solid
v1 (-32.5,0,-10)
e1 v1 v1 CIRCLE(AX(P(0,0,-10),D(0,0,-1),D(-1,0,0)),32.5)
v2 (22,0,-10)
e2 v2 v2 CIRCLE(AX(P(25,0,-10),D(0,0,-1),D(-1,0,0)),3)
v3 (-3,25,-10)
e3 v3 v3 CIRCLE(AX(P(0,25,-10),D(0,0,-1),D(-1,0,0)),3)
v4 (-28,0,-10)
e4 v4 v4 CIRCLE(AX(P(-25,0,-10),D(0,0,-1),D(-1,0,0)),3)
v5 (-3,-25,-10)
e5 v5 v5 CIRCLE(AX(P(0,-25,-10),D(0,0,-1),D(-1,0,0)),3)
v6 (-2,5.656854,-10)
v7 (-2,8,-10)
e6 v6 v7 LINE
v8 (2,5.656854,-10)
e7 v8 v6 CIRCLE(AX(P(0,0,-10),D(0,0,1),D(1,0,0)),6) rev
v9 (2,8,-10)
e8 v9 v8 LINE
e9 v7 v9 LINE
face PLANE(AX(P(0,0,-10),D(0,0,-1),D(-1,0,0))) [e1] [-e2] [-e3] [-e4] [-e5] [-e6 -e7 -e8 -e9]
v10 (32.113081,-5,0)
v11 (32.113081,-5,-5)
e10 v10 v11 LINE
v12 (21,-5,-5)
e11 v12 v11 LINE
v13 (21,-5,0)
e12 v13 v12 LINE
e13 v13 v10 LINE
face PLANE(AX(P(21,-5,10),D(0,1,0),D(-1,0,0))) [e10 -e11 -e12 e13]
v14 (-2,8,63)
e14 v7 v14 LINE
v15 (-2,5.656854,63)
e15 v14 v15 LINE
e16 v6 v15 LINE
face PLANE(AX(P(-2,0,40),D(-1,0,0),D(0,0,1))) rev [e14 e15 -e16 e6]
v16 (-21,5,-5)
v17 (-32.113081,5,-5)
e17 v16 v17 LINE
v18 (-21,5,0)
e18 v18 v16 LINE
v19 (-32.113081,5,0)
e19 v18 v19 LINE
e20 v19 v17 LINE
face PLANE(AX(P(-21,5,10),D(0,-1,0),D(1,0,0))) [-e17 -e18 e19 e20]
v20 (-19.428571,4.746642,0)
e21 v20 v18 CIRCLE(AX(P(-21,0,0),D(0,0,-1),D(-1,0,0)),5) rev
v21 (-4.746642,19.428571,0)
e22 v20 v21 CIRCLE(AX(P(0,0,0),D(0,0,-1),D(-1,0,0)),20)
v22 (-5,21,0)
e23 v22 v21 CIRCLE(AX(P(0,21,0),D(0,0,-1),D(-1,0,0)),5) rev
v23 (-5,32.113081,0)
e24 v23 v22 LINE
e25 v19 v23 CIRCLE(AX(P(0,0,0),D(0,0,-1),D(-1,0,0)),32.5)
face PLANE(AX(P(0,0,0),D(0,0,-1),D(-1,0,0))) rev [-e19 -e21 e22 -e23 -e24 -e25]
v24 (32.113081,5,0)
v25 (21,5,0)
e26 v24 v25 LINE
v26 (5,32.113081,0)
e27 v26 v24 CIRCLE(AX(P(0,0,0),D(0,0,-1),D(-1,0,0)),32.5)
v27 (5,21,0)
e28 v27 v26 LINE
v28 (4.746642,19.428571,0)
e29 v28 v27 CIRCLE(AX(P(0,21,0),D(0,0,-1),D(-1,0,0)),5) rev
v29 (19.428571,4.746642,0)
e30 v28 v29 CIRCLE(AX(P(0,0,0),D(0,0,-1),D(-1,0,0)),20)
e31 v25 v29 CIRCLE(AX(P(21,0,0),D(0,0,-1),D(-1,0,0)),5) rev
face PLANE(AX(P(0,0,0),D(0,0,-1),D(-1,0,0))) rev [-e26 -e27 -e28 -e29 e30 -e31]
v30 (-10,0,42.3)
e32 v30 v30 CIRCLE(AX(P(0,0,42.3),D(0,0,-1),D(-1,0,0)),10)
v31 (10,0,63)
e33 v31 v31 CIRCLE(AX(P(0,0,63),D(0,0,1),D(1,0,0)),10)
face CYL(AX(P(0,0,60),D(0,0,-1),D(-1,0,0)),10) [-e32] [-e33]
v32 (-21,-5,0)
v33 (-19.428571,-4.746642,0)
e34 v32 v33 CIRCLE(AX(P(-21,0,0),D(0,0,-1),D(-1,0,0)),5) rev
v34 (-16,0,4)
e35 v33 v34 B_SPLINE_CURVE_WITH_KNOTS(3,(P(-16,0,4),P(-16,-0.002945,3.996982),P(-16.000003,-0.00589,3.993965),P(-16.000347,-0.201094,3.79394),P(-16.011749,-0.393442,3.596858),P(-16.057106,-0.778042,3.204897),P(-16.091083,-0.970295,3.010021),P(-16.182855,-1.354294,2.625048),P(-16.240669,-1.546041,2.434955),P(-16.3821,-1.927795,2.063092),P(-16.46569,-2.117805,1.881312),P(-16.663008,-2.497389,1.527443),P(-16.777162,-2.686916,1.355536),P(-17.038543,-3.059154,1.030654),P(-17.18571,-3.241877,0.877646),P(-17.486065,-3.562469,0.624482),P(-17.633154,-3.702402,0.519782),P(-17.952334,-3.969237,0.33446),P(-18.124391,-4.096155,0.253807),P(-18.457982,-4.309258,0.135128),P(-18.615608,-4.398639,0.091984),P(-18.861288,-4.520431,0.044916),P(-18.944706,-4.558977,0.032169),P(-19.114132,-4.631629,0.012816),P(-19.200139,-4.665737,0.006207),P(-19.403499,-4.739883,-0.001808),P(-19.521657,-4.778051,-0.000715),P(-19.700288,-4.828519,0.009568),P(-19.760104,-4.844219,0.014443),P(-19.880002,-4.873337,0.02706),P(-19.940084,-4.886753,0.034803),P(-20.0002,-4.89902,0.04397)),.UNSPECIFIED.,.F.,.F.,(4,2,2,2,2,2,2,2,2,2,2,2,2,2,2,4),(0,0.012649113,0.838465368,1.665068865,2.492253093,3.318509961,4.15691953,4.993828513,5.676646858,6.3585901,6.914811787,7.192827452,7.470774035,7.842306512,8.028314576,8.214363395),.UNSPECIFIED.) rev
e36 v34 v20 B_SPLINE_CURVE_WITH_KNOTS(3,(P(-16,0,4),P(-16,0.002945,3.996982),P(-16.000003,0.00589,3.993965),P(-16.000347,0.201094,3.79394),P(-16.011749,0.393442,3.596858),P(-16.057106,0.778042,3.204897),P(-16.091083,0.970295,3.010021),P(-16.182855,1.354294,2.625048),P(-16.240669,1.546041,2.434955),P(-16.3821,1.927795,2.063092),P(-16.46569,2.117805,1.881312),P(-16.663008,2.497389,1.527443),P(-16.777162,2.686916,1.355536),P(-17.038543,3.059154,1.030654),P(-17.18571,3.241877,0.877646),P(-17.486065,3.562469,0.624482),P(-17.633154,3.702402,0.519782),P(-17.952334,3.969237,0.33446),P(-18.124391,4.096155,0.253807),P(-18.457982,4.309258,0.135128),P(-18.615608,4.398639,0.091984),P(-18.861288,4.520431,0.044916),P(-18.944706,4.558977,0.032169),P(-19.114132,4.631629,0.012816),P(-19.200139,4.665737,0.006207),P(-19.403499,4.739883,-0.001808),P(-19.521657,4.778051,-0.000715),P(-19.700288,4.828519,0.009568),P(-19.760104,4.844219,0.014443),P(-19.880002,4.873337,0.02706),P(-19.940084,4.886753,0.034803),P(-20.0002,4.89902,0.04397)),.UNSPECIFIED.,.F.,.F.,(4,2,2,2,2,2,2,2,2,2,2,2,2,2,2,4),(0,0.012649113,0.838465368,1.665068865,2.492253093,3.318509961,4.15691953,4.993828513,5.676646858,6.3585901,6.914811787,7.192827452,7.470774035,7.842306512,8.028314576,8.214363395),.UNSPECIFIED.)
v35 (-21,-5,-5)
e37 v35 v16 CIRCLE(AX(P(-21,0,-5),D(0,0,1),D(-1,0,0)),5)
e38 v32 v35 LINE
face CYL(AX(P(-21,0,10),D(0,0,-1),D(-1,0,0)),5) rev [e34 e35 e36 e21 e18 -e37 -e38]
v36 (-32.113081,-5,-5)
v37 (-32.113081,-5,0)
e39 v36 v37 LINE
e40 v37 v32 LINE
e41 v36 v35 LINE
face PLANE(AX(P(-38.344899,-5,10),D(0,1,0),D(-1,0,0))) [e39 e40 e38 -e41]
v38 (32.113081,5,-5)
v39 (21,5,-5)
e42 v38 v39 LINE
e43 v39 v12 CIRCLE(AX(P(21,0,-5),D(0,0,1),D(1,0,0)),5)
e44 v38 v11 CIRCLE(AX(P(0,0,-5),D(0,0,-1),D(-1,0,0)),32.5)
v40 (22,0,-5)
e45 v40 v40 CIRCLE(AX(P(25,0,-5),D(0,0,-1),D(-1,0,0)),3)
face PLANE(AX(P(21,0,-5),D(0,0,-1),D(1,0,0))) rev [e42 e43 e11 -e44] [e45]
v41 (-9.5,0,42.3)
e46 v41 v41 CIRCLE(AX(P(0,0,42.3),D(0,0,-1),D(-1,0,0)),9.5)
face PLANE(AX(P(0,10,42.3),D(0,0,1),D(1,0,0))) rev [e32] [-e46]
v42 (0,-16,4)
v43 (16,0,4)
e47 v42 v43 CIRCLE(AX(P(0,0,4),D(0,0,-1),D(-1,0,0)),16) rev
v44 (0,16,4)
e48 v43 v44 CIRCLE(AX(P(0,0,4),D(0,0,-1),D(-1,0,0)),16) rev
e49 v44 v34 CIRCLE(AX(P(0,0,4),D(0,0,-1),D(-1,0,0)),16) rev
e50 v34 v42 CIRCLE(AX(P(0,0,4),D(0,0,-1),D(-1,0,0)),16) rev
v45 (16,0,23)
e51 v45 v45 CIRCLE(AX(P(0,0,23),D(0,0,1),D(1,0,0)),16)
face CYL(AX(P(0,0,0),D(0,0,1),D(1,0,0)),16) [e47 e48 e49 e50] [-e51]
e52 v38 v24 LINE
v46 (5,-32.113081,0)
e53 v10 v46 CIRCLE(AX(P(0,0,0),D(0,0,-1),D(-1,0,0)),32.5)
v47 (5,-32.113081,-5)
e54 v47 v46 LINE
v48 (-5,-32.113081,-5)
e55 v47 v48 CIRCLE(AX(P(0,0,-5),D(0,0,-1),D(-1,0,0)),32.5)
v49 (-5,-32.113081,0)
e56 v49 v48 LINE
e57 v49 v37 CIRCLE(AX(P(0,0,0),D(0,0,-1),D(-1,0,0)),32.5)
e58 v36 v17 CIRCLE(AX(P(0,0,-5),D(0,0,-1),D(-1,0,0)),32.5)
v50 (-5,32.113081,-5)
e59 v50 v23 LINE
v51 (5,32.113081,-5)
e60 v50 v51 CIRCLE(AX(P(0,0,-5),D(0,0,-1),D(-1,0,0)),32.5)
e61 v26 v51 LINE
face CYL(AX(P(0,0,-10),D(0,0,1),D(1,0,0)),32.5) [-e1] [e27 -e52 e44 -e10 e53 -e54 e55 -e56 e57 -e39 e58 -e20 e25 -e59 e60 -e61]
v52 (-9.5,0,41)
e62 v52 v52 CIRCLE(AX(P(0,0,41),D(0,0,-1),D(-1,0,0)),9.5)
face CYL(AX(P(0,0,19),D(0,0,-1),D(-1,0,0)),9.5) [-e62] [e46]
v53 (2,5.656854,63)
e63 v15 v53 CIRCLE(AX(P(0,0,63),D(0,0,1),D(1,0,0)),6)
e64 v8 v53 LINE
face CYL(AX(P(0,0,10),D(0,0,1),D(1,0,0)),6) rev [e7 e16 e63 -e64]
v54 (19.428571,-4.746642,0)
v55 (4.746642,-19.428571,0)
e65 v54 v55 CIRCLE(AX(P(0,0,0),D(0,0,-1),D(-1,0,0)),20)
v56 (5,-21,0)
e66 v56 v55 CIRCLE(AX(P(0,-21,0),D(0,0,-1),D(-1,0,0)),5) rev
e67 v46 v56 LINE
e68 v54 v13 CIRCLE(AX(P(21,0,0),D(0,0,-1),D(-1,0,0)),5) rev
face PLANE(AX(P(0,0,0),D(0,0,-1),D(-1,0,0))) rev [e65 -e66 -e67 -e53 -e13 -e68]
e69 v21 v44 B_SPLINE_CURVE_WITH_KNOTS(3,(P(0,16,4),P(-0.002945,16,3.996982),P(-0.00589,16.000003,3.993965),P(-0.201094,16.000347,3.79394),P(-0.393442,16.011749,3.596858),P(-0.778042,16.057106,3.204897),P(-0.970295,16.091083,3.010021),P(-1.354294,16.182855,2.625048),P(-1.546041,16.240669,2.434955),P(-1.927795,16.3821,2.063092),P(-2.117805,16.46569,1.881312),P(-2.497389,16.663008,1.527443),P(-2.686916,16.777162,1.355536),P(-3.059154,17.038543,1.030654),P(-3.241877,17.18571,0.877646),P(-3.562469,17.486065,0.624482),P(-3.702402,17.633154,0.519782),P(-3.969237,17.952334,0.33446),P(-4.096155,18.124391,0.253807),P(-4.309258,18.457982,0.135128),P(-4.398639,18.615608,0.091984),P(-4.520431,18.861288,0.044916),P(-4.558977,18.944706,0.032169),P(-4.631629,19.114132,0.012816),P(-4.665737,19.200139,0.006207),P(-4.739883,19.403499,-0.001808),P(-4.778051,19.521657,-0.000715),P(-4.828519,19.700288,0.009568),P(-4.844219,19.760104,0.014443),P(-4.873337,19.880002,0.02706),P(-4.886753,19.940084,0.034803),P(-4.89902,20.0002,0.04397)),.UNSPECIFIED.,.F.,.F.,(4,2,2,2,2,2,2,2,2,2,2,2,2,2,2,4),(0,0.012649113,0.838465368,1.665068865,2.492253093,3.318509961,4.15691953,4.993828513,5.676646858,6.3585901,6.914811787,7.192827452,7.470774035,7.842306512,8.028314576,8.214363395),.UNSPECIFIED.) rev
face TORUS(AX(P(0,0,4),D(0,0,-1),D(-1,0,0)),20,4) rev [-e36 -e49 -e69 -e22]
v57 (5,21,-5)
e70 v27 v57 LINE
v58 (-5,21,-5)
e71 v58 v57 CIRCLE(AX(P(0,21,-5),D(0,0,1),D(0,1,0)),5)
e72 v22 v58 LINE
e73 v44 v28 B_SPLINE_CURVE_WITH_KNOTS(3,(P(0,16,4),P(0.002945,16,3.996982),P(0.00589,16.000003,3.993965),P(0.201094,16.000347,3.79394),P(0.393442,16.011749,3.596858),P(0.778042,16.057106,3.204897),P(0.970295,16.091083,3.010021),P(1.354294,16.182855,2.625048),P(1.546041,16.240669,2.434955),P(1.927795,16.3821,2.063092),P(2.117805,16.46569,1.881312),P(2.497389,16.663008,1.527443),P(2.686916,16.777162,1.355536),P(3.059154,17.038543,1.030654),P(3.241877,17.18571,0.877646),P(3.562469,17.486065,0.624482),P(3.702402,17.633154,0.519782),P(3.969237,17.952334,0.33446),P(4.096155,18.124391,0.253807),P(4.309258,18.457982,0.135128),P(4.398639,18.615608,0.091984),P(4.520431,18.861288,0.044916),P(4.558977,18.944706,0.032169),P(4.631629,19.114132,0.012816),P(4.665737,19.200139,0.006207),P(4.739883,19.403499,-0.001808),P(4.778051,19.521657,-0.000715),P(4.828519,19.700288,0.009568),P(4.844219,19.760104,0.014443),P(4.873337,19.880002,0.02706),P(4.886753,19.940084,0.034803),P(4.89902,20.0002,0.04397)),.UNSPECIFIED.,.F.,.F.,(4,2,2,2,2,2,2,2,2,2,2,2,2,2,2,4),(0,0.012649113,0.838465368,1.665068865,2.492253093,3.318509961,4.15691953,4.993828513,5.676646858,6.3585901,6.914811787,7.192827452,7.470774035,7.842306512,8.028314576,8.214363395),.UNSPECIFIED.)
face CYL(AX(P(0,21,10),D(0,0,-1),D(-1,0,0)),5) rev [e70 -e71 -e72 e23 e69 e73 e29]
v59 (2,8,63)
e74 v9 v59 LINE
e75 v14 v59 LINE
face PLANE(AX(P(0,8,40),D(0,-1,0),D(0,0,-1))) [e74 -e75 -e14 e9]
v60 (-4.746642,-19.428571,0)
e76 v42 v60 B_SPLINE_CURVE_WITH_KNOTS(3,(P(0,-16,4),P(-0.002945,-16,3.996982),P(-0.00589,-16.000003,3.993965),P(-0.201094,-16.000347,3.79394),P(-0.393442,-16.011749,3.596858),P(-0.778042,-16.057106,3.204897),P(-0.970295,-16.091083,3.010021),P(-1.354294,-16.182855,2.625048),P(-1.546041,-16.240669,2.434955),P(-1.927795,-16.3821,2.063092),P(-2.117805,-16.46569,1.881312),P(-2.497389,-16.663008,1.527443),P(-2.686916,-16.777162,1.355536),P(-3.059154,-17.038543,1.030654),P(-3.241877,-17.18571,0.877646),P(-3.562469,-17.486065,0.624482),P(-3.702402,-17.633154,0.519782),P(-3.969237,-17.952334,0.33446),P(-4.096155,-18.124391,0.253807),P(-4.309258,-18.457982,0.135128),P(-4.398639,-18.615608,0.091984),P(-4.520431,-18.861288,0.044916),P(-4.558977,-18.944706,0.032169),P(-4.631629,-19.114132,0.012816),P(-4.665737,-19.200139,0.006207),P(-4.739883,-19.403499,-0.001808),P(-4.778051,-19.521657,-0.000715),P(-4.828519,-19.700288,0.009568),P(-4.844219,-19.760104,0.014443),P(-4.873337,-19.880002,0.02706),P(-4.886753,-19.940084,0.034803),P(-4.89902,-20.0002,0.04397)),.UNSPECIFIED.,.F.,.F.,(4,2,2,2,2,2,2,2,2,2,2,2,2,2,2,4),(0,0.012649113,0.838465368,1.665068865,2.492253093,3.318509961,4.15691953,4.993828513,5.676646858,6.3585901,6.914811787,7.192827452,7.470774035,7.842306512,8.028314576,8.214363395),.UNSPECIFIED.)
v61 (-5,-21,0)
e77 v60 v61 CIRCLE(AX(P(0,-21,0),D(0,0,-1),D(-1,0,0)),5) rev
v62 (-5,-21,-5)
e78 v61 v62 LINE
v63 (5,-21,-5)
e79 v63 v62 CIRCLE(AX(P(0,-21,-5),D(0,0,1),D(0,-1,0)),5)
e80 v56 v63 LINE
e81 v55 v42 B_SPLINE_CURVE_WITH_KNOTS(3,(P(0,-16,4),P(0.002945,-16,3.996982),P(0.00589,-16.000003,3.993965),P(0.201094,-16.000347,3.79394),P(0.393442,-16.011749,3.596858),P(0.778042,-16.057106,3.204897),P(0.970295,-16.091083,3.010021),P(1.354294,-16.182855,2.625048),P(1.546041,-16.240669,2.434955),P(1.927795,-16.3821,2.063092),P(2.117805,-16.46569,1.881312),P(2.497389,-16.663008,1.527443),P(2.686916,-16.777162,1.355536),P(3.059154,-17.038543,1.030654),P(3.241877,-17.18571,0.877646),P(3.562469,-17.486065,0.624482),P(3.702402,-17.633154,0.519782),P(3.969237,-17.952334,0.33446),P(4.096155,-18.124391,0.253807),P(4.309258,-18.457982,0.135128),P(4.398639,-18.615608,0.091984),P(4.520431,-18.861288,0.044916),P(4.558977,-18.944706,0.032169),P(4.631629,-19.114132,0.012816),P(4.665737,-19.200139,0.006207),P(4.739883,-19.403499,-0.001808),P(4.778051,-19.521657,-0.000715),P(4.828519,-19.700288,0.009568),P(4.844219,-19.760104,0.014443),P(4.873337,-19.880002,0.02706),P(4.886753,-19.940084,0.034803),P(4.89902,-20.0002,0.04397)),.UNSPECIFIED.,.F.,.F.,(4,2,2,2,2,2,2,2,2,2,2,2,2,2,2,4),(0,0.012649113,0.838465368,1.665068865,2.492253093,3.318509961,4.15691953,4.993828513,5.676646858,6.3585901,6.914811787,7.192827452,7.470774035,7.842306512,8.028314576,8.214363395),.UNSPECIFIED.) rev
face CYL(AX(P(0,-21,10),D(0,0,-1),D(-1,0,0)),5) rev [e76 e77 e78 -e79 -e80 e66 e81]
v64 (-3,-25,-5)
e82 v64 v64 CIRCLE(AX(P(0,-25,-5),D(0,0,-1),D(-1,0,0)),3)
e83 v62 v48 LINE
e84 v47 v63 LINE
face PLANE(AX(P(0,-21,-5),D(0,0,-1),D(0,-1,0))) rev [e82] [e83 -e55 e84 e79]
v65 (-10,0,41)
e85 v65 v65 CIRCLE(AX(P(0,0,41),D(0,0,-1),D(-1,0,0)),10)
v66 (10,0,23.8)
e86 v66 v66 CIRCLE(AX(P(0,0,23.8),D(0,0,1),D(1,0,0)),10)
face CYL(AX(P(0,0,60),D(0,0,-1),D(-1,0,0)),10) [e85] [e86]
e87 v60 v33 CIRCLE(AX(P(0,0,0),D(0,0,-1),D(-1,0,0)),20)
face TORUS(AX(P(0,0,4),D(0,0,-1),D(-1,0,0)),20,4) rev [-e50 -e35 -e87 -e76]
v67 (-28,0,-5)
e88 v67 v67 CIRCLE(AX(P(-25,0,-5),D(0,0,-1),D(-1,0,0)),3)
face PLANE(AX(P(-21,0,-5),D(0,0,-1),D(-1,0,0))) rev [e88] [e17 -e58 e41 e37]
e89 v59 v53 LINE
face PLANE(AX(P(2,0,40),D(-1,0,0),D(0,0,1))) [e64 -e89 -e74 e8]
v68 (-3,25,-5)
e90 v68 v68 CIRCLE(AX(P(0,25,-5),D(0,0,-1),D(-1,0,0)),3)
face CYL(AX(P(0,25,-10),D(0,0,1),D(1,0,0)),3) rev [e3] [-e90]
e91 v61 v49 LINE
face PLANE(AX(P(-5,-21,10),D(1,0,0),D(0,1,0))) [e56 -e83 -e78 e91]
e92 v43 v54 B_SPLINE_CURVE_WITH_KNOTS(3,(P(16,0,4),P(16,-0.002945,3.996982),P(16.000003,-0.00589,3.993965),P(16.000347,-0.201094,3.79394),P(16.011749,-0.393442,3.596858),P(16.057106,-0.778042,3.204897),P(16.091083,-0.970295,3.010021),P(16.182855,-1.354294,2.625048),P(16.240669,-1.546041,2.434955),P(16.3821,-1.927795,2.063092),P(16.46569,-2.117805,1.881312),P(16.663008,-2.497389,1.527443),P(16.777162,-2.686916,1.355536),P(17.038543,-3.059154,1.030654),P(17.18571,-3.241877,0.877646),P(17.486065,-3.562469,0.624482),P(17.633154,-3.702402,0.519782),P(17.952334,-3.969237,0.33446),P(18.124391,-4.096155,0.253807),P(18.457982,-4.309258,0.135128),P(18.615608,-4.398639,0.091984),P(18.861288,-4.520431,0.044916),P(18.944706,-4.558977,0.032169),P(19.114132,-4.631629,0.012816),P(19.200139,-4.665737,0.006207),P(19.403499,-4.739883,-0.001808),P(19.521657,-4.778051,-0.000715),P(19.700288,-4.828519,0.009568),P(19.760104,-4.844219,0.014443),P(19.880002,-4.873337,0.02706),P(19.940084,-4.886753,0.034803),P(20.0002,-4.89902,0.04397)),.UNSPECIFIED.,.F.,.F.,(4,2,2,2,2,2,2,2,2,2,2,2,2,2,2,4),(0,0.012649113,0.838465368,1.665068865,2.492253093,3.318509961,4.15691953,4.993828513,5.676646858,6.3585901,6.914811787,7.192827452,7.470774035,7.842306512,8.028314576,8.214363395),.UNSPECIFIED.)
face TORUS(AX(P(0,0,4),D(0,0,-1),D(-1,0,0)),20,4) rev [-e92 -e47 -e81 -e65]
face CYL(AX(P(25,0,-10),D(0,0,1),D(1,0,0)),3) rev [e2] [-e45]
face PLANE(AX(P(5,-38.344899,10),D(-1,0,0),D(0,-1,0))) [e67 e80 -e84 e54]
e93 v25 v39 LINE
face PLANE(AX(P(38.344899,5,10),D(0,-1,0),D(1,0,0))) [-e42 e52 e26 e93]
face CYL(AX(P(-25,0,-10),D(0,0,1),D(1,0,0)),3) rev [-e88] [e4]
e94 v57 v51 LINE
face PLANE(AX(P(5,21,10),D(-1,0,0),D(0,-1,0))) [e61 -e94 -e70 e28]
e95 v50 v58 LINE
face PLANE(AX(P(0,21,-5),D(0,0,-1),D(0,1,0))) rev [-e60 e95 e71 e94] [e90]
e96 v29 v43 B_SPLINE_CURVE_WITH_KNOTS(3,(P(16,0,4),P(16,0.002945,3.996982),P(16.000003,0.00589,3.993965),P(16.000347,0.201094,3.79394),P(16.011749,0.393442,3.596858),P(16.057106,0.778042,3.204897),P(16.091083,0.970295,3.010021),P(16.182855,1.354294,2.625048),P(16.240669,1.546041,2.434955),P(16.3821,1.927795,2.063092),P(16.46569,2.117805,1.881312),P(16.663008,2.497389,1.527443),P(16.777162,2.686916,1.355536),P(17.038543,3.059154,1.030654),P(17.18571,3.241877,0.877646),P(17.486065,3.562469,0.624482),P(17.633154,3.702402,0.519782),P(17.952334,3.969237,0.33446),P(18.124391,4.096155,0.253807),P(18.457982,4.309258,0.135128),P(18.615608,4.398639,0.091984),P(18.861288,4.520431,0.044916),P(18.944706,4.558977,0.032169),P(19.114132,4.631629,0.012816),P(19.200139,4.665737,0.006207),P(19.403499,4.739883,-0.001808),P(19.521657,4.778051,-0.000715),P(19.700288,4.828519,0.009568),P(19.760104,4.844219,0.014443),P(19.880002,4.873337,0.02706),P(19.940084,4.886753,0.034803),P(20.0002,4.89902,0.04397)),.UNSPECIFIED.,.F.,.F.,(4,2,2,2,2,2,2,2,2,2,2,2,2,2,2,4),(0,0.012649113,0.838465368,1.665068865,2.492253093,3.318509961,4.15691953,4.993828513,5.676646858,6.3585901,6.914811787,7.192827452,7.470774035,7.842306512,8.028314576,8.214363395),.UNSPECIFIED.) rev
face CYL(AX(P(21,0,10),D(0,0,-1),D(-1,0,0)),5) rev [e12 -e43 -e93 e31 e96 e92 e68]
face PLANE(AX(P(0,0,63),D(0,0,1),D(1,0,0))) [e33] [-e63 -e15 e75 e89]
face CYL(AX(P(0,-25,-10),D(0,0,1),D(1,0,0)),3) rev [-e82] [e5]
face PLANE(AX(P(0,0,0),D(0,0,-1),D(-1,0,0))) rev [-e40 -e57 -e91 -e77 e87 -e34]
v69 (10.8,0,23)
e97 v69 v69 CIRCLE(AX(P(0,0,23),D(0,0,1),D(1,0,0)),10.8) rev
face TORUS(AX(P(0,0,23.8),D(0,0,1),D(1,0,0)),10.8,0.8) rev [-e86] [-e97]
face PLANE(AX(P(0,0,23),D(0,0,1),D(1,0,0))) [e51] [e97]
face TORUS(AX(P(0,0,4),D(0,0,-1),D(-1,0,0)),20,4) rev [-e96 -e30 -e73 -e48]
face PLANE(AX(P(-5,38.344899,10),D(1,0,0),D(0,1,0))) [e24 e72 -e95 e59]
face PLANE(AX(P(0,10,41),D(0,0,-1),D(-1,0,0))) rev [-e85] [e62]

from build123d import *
from build123d.topology import SkipClean

# Parameters (mm, degrees)
SZKIC1_R                         = 10
DODANIE_WYCI_GNI_CIE1_DEPTH      = 60
SZKIC3_R                         = 6
WYTNIJ_WYCI_GNI_CIE1_DEPTH       = 50
WYTNIJ_WYCI_GNI_CIE2_DEPTH       = 20
SZKIC9_R                         = 32.5
SZKIC9_R_2                       = 3
SZKIC9_R_3                       = 10
DODANIE_WYCI_GNI_CIE3_DEPTH      = 10
SZKIC12_R                        = 10
DODANIE_WYCI_GNI_CIE4_DEPTH      = 10
DODANIE_WYCI_GNI_CIE6_DEPTH      = 4
DODANIE_WYCI_GNI_CIE6_DEPTH_BACK = 10
SZKIC13_R                        = 16
SZKIC13_R_2                      = 10
SZKIC14_W                        = 1.3
SZKIC14_H                        = 0.5
FILLET3_R                        = 4
WYTNIJ_WYCI_GNI_CIE4_START       = -5
WYTNIJ_WYCI_GNI_CIE4_DEPTH       = 15
CUT_EXTRUDE1_DEPTH               = 84.740671122
CUT_EXTRUDE1_DEPTH_BACK          = 84.740671122
FILLET1_R                        = 0.8
CIRPATTERN1_COUNT                = 4
PRZENIE_CIAN_1_OUTLINE_W         = 0.5
PRZENIE_CIAN_1_OUTLINE_H         = 1.3
PRZENIE_CIAN_1_2_OUTLINE_W       = 0.5
PRZENIE_CIAN_1_2_OUTLINE_H       = 1.3
PRZENIE_CIAN_2_BY                = 3


with BuildPart() as part:
    # Szkic1 → Dodanie-wyciągnięcie1 (new body)
    with BuildSketch(Plane.XY):
        Circle(SZKIC1_R)
    extrude(amount=DODANIE_WYCI_GNI_CIE1_DEPTH)

    # Szkic3 → Wytnij-wyciągnięcie1 (cut)
    with BuildSketch(Plane.XY.offset(60)):
        Circle(SZKIC3_R)
    extrude(amount=-WYTNIJ_WYCI_GNI_CIE1_DEPTH, mode=Mode.SUBTRACT)

    # Szkic8 → Wytnij-wyciągnięcie2 (cut)
    with BuildSketch(Plane.XY.offset(60)):
        with BuildLine():
            Line((0, 8), (0, 6))
            ThreePointArc((0, 6), (1.014611872, 5.913591358), (2, 5.656854249))
            Line((2, 5.656854249), (2, 8))
            Line((2, 8), (0, 8))
        make_face()
        with BuildLine():
            ThreePointArc((-2, 5.656854249), (-1.014611872, 5.913591358), (0, 6))
            Line((0, 6), (0, 8))
            Line((0, 8), (-2, 8))
            Line((-2, 8), (-2, 5.656854249))
        make_face()
    extrude(amount=-WYTNIJ_WYCI_GNI_CIE2_DEPTH, mode=Mode.SUBTRACT)


with BuildPart() as body_2:
    # Szkic9 → Dodanie-wyciągnięcie3 (new body)
    with BuildSketch(Plane(origin=(0, 0, 0), x_dir=(-1, 0, 0), z_dir=(0, 0, -1))):
        Circle(SZKIC9_R)
        with Locations((0, 25)):
            Circle(SZKIC9_R_2, mode=Mode.SUBTRACT)
        with Locations((-25, 0)):
            Circle(SZKIC9_R_2, mode=Mode.SUBTRACT)
        with Locations((0, -25)):
            Circle(SZKIC9_R_2, mode=Mode.SUBTRACT)
        with Locations((25, 0)):
            Circle(SZKIC9_R_2, mode=Mode.SUBTRACT)
        with Locations(Location((0, 0, 0), (0, 0, 180))):
            Circle(SZKIC9_R_3, mode=Mode.SUBTRACT)
    extrude(amount=DODANIE_WYCI_GNI_CIE3_DEPTH)


with BuildPart() as dodanie_wyci_gni_cie4_tool:
    # Szkic12 → Dodanie-wyciągnięcie4 (new body)
    with BuildSketch(Plane(origin=(0, 0, -10), x_dir=(-1, 0, 0), z_dir=(0, 0, -1))):
        Circle(SZKIC12_R)
    extrude(amount=-DODANIE_WYCI_GNI_CIE4_DEPTH)


with BuildPart() as part_1:
    add(part.part)


with BuildPart() as part_2:
    # Dodanie-wyciągnięcie4: joined with dodanie_wyci_gni_cie4_tool
    add(part_1.part.fuse(dodanie_wyci_gni_cie4_tool.part, body_2.part, tol=0.00001))

    # Szkic13 → Dodanie-wyciągnięcie6 (add, two sides: drawn at the far end of the back side and taken through both)
    with BuildSketch(Plane.XY.offset(10).offset(-DODANIE_WYCI_GNI_CIE6_DEPTH_BACK)):
        Circle(SZKIC13_R)
        Circle(SZKIC13_R_2, mode=Mode.SUBTRACT)
    extrude(amount=DODANIE_WYCI_GNI_CIE6_DEPTH + DODANIE_WYCI_GNI_CIE6_DEPTH_BACK)

    # Szkic14 → Wycięcie-obrót1 (revolve, cut)
    with BuildSketch(Plane(origin=(0, 0, 0), x_dir=(0, 0, -1), z_dir=(1, 0, 0)), mode=Mode.PRIVATE) as wyci_cie_obr_t1_sk:
        with Locations((-32.65, 9.75)):
            Rectangle(SZKIC14_W, SZKIC14_H)
    revolve(wyci_cie_obr_t1_sk.sketch.rotate(Axis((0, 0, 10), (0, 0, 1)), 90), axis=Axis((0, 0, 10), (0, 0, 1)), mode=Mode.SUBTRACT)

    # Fillet3
    fillet3_edges = [part_2.edges().sort_by_distance(p)[0] for p in [
        (-16, 0, 0),
    ]]
    fillet(fillet3_edges, radius=FILLET3_R)

    # Szkic15 → Wytnij-wyciągnięcie4 (cut)
    with SkipClean():  # the faces are left unmerged after this step: merging them gives an invalid solid
        with BuildSketch(Plane.XY.offset(WYTNIJ_WYCI_GNI_CIE4_START)):
            with BuildLine():
                Line((-21, 5), (-38.344899327, 5))
                Line((-38.344899327, 5), (-38.344899327, -5))
                Line((-38.344899327, -5), (-21, -5))
                ThreePointArc((-21, -5), (-16, 0), (-21, 5))
            make_face()
        wytnij_wyci_gni_cie4 = extrude(amount=WYTNIJ_WYCI_GNI_CIE4_DEPTH, mode=Mode.SUBTRACT)

    # Sketch1 → Cut-Extrude1 (cut, two sides: drawn at the far end of the back side and taken through both)
    with SkipClean():  # the faces are left unmerged after this step: merging them gives an invalid solid
        with BuildSketch(Plane.XY.offset(60).offset(-CUT_EXTRUDE1_DEPTH_BACK)):
            with BuildLine():
                ThreePointArc((2, 5.656854249), (0, 6), (-2, 5.656854249))
                ThreePointArc((-2, 5.656854249), (-3.464101615, -4.898979486), (6, 0))
                ThreePointArc((6, 0), (4.898979486, 3.464101615), (2, 5.656854249))
            make_face()
            with BuildLine():
                Line((2, 8), (-2, 8))
                Line((-2, 8), (-2, 5.656854249))
                ThreePointArc((-2, 5.656854249), (0, 6), (2, 5.656854249))
                Line((2, 5.656854249), (2, 8))
            make_face()
        extrude(amount=CUT_EXTRUDE1_DEPTH + CUT_EXTRUDE1_DEPTH_BACK, mode=Mode.SUBTRACT)

    # Fillet1
    fillet1_edges = [part_2.edges().sort_by_distance(p)[0] for p in [
        (-10, 0, 14),
    ]]
    fillet(fillet1_edges, radius=FILLET1_R)

    # CirPattern1: Wytnij-wyciągnięcie4 ×4 about axis
    cirpattern1_axis = Axis((0, 0, 0), (0, 0, 1))
    for i in range(1, CIRPATTERN1_COUNT):
        add(wytnij_wyci_gni_cie4.rotate(cirpattern1_axis, i * 360 / CIRPATTERN1_COUNT), mode=Mode.SUBTRACT)

    # Przenieś ścianę1: read off the stored shape, not the designer's step
    # Przenieś ścianę1 outline → Przenieś ścianę1 (revolve, cut)
    with BuildSketch(Plane.XZ):
        with Locations((9.75, 41.65)):
            Rectangle(PRZENIE_CIAN_1_OUTLINE_W, PRZENIE_CIAN_1_OUTLINE_H)
    revolve(axis=Axis((0, 0, 0), (0, 0, 1)), mode=Mode.SUBTRACT)

    # Przenie_ _cian_1 2 outline → Przenie_ _cian_1 2 (revolve)
    with BuildSketch(Plane.XZ):
        with Locations((9.75, 32.65)):
            Rectangle(PRZENIE_CIAN_1_2_OUTLINE_W, PRZENIE_CIAN_1_2_OUTLINE_H)
        with BuildLine():
            ThreePointArc((10.8, 23), (10.234314575, 23.234314575), (10, 23.8))
            Line((10, 23.8), (10, 14.8))
            ThreePointArc((10, 14.8), (10.234314575, 14.234314575), (10.8, 14))
            Line((10.8, 14), (16, 14))
            Line((16, 14), (16, 23))
            Line((16, 23), (10.8, 23))
        make_face()
    revolve(axis=Axis((0, 0, 0), (0, 0, 1)))

    # Przenieś ścianę2: a face moved outward by 3.0
    extrude(part_2.faces().sort_by_distance((0, -8, 60))[0], amount=PRZENIE_CIAN_2_BY, dir=(0, 0, 1))


solid = part_2.part
